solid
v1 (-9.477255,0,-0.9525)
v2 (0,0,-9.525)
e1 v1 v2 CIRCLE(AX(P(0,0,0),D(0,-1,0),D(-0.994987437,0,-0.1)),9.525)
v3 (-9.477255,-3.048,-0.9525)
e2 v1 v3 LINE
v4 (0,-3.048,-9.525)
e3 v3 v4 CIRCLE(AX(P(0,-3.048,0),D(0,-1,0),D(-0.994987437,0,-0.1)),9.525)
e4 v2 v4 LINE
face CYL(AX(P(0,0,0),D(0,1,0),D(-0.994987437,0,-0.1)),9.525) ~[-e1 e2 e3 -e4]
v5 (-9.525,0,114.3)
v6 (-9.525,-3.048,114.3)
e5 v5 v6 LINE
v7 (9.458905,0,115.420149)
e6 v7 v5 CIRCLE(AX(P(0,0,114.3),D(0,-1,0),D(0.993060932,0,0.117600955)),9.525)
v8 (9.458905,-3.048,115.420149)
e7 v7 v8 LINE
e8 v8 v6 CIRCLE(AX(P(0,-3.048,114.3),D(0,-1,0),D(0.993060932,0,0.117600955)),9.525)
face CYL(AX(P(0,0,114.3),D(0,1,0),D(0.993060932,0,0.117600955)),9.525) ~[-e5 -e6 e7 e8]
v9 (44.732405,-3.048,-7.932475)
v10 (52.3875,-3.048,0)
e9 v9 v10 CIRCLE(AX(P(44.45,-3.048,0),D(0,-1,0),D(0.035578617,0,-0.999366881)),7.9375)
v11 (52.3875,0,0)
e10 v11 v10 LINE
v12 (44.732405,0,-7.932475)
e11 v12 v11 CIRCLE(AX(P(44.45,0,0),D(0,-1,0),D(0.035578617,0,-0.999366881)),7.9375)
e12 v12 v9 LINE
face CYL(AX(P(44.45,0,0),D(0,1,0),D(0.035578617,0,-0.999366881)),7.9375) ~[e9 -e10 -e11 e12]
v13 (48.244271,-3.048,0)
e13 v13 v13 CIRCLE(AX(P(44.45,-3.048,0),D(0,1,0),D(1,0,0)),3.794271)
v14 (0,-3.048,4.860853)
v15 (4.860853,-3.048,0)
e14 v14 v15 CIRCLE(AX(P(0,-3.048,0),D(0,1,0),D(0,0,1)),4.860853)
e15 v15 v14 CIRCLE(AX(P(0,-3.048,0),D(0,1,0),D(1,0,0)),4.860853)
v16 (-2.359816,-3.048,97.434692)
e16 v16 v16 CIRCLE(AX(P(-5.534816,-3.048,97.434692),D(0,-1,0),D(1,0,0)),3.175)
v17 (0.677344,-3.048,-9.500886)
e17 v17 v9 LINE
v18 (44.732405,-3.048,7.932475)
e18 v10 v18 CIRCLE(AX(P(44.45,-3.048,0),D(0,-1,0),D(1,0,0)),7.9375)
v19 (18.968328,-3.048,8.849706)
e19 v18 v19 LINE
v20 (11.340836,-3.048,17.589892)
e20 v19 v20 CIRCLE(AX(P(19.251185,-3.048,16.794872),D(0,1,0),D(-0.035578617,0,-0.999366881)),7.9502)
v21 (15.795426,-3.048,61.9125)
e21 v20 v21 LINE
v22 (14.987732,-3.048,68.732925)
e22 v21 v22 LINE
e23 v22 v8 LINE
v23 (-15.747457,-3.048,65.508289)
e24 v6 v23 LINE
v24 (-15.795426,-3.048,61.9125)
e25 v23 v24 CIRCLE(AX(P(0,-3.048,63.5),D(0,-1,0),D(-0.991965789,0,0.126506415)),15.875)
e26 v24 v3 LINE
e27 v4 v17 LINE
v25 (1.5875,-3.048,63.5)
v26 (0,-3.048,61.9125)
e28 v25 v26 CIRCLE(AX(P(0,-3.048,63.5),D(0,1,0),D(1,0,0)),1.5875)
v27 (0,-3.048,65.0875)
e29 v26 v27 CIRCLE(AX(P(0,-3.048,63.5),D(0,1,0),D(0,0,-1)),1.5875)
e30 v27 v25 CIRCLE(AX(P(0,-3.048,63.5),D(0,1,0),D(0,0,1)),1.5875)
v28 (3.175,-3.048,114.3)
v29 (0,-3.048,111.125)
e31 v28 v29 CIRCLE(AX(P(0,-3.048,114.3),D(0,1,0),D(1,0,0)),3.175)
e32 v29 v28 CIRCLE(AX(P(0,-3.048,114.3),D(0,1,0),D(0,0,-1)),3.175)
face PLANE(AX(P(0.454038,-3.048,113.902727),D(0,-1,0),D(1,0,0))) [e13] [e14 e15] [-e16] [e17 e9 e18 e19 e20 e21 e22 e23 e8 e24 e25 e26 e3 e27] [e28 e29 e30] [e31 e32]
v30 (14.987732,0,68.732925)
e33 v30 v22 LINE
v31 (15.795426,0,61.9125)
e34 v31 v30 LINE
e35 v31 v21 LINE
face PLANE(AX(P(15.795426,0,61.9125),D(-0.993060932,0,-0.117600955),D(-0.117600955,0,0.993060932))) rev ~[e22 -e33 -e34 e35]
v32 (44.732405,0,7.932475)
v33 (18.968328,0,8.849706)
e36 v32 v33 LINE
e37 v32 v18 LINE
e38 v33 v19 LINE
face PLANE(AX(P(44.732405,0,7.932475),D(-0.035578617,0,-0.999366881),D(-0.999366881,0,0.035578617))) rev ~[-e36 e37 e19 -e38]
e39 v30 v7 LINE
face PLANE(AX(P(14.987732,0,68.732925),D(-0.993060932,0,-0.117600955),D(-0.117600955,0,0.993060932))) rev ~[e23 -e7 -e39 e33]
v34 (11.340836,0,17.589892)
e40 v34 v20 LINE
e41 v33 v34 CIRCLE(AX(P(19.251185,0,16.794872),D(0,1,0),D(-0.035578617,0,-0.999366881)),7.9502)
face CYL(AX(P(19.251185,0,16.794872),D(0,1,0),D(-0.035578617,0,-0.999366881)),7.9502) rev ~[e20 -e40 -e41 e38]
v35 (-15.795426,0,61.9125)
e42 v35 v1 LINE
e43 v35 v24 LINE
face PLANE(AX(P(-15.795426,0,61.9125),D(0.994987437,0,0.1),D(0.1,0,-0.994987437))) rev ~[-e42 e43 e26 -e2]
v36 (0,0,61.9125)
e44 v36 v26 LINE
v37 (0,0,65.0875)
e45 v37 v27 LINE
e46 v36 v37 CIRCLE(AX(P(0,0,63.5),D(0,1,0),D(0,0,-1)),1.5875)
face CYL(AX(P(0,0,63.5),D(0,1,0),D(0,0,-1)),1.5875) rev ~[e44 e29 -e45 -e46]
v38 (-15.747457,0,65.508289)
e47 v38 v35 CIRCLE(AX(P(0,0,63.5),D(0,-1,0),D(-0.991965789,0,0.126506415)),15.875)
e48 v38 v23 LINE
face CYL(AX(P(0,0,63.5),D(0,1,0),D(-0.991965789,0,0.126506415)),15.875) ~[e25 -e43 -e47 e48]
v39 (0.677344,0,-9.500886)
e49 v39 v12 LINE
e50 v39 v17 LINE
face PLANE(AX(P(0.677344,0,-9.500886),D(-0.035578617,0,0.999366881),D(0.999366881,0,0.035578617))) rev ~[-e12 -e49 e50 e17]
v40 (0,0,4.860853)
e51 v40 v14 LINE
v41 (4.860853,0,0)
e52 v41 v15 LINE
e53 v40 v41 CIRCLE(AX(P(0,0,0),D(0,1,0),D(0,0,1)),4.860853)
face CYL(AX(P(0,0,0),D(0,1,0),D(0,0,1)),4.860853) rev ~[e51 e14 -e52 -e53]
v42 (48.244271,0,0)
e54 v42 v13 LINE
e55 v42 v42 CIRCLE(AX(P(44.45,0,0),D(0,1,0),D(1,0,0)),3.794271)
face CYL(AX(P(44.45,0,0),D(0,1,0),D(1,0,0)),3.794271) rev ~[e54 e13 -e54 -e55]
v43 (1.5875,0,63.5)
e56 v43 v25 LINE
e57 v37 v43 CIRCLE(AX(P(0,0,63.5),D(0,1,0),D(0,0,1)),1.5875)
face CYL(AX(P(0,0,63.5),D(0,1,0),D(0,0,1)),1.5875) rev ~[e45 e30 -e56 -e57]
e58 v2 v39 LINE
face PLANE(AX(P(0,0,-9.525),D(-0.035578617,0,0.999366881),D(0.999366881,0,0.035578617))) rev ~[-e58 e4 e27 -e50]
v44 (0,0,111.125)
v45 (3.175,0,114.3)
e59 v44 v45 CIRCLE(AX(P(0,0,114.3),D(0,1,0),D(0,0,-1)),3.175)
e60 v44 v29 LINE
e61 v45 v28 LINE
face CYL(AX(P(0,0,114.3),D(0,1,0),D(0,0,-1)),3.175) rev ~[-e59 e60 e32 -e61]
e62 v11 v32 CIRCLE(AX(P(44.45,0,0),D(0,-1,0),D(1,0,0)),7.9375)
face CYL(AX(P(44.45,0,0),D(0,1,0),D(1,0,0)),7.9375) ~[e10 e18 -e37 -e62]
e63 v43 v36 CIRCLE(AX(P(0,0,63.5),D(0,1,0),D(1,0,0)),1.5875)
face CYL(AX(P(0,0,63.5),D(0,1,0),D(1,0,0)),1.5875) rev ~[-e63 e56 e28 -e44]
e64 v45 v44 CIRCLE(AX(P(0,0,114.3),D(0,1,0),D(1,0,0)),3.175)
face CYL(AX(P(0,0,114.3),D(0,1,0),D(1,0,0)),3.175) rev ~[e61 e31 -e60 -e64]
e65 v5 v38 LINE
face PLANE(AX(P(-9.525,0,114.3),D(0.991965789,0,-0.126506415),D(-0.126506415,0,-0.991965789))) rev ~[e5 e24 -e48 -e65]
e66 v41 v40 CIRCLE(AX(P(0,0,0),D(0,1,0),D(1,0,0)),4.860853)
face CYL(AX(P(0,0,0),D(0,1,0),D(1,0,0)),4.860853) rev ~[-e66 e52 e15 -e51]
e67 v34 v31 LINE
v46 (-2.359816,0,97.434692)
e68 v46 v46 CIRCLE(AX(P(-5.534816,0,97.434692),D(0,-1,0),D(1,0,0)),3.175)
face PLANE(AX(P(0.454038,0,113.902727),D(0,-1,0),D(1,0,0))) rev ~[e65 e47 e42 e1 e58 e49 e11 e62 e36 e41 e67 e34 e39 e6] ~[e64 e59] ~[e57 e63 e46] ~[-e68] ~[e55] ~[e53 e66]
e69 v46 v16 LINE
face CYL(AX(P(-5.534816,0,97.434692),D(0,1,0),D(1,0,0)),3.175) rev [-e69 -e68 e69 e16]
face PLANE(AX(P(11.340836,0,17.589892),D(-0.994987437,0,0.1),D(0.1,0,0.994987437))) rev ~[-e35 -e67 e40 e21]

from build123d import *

# Parameters (mm, degrees)
F0_R     = 3.175
F1_DEPTH = 3.048


with BuildPart() as f1:
    # F0 (on Front) → F1 (new body)
    with BuildSketch(Plane.XZ):
        with BuildLine():
            ThreePointArc((-9.525, 114.3), (-6.7351920908, 107.5648079092), (0, 104.775))
            ThreePointArc((0, 104.775), (6.7351920908, 107.5648079092), (9.525, 114.3))
            ThreePointArc((9.525, 114.3), (9.5084619879, 114.8610486832), (9.4589053806, 115.4201490977))
            ThreePointArc((9.4589053806, 115.4201490977), (-0.5610486832, 123.8084619879), (-9.525, 114.3))
        make_face()
        with BuildLine():
            ThreePointArc((3.175, 114.3), (2.2450640303, 112.0549359697), (0, 111.125))
            ThreePointArc((0, 111.125), (-2.2450640303, 116.5450640303), (3.175, 114.3))
        make_face(mode=Mode.SUBTRACT)
        with BuildLine():
            ThreePointArc((9.525, 114.3), (6.7351920908, 107.5648079092), (0, 104.775))
            Line((0, 104.775), (0, 79.375))
            ThreePointArc((0, 79.375), (9.1908363712, 76.4438847259), (14.9877324754, 68.7329246359))
            Line((14.9877324754, 68.7329246359), (9.4589053806, 115.4201490977))
            ThreePointArc((9.4589053806, 115.4201490977), (9.5084619879, 114.8610486832), (9.525, 114.3))
        make_face()
        with BuildLine():
            Line((0, 79.375), (0, 104.775))
            ThreePointArc((0, 104.775), (-6.7351920908, 107.5648079092), (-9.525, 114.3))
            Line((-9.525, 114.3), (-15.7474569047, 65.5082893304))
            ThreePointArc((-15.7474569047, 65.5082893304), (-10.4912828548, 75.4142187767), (0, 79.375))
        make_face()
        with Locations((-5.5348160677, 97.4346920848)):
            Circle(F0_R, mode=Mode.SUBTRACT)
        with BuildLine():
            ThreePointArc((14.9877324754, 68.7329246359), (9.1908363712, 76.4438847259), (0, 79.375))
            Line((0, 79.375), (0, 65.0875))
            ThreePointArc((0, 65.0875), (1.1225320151, 64.6225320151), (1.5875, 63.5))
            ThreePointArc((1.5875, 63.5), (1.1225320151, 62.3774679849), (0, 61.9125))
            Line((0, 61.9125), (0, 47.625))
            ThreePointArc((0, 47.625), (10.6492737428, 51.7267849017), (15.7954255641, 61.9125))
            Line((15.7954255641, 61.9125), (14.9877324754, 68.7329246359))
        make_face()
        with BuildLine():
            Line((0, 65.0875), (0, 79.375))
            ThreePointArc((0, 79.375), (-10.4912828548, 75.4142187767), (-15.7474569047, 65.5082893304))
            ThreePointArc((-15.7474569047, 65.5082893304), (-15.8735876171, 63.7117573215), (-15.7954255641, 61.9125))
            ThreePointArc((-15.7954255641, 61.9125), (-10.6492737428, 51.7267849017), (0, 47.625))
            Line((0, 47.625), (0, 61.9125))
            ThreePointArc((0, 61.9125), (-1.5875, 63.5), (0, 65.0875))
        make_face()
        with BuildLine():
            Line((11.3408358685, 17.5898921545), (15.7954255641, 61.9125))
            ThreePointArc((15.7954255641, 61.9125), (10.6492737428, 51.7267849017), (0, 47.625))
            Line((0, 47.625), (0, 9.525))
            ThreePointArc((0, 9.525), (6.7351920908, 6.7351920908), (9.525, 0))
            Line((9.525, 0), (36.5125, 0))
            ThreePointArc((36.5125, 0), (38.9380895153, 5.7116327839), (44.7324052746, 7.9324746146))
            Line((44.7324052746, 7.9324746146), (18.968327868, 8.8497055806))
            ThreePointArc((18.968327868, 8.8497055806), (13.2612039825, 11.5674628959), (11.3408358685, 17.5898921545))
        make_face()
        with BuildLine():
            ThreePointArc((0, 47.625), (-10.6492737428, 51.7267849017), (-15.7954255641, 61.9125))
            Line((-15.7954255641, 61.9125), (-9.4772553384, -0.9525))
            ThreePointArc((-9.4772553384, -0.9525), (-7.063929059, 6.3895642457), (0, 9.525))
            Line((0, 9.525), (0, 47.625))
        make_face()
        with BuildLine():
            ThreePointArc((0, 9.525), (-7.063929059, 6.3895642457), (-9.4772553384, -0.9525))
            ThreePointArc((-9.4772553384, -0.9525), (-6.3895642457, -7.063929059), (0, -9.525))
            Line((0, -9.525), (0.6773435479, -9.500885786))
            ThreePointArc((0.6773435479, -9.500885786), (6.9705567315, -6.4912990883), (9.525, 0))
            Line((9.525, 0), (4.8608528189, 0))
            ThreePointArc((4.8608528189, 0), (-3.4371419906, -3.4371419906), (0, 4.8608528189))
            Line((0, 4.8608528189), (0, 9.525))
        make_face()
        with BuildLine():
            ThreePointArc((9.525, 0), (6.7351920908, 6.7351920908), (0, 9.525))
            Line((0, 9.525), (0, 4.8608528189))
            ThreePointArc((0, 4.8608528189), (3.4371419906, 3.4371419906), (4.8608528189, 0))
            Line((4.8608528189, 0), (9.525, 0))
        make_face()
        with BuildLine():
            Line((36.5125, 0), (9.525, 0))
            ThreePointArc((9.525, 0), (6.9705567315, -6.4912990883), (0.6773435479, -9.500885786))
            Line((0.6773435479, -9.500885786), (44.7324052746, -7.9324746146))
            ThreePointArc((44.7324052746, -7.9324746146), (38.9380895153, -5.7116327839), (36.5125, 0))
        make_face()
        with BuildLine():
            ThreePointArc((52.3875, 0), (50.1616327839, 5.5119104847), (44.7324052746, 7.9324746146))
            ThreePointArc((44.7324052746, 7.9324746146), (38.9380895153, 5.7116327839), (36.5125, 0))
            Line((36.5125, 0), (40.655729, 0))
            ThreePointArc((40.655729, 0), (44.45, 3.794271), (48.244271, 0))
            Line((48.244271, 0), (52.3875, 0))
        make_face()
        with BuildLine():
            Line((40.655729, 0), (36.5125, 0))
            ThreePointArc((36.5125, 0), (38.9380895153, -5.7116327839), (44.7324052746, -7.9324746146))
            ThreePointArc((44.7324052746, -7.9324746146), (50.1616327839, -5.5119104847), (52.3875, 0))
            Line((52.3875, 0), (48.244271, 0))
            ThreePointArc((48.244271, 0), (44.45, -3.794271), (40.655729, 0))
        make_face()
    extrude(amount=F1_DEPTH)


solid = f1.part
